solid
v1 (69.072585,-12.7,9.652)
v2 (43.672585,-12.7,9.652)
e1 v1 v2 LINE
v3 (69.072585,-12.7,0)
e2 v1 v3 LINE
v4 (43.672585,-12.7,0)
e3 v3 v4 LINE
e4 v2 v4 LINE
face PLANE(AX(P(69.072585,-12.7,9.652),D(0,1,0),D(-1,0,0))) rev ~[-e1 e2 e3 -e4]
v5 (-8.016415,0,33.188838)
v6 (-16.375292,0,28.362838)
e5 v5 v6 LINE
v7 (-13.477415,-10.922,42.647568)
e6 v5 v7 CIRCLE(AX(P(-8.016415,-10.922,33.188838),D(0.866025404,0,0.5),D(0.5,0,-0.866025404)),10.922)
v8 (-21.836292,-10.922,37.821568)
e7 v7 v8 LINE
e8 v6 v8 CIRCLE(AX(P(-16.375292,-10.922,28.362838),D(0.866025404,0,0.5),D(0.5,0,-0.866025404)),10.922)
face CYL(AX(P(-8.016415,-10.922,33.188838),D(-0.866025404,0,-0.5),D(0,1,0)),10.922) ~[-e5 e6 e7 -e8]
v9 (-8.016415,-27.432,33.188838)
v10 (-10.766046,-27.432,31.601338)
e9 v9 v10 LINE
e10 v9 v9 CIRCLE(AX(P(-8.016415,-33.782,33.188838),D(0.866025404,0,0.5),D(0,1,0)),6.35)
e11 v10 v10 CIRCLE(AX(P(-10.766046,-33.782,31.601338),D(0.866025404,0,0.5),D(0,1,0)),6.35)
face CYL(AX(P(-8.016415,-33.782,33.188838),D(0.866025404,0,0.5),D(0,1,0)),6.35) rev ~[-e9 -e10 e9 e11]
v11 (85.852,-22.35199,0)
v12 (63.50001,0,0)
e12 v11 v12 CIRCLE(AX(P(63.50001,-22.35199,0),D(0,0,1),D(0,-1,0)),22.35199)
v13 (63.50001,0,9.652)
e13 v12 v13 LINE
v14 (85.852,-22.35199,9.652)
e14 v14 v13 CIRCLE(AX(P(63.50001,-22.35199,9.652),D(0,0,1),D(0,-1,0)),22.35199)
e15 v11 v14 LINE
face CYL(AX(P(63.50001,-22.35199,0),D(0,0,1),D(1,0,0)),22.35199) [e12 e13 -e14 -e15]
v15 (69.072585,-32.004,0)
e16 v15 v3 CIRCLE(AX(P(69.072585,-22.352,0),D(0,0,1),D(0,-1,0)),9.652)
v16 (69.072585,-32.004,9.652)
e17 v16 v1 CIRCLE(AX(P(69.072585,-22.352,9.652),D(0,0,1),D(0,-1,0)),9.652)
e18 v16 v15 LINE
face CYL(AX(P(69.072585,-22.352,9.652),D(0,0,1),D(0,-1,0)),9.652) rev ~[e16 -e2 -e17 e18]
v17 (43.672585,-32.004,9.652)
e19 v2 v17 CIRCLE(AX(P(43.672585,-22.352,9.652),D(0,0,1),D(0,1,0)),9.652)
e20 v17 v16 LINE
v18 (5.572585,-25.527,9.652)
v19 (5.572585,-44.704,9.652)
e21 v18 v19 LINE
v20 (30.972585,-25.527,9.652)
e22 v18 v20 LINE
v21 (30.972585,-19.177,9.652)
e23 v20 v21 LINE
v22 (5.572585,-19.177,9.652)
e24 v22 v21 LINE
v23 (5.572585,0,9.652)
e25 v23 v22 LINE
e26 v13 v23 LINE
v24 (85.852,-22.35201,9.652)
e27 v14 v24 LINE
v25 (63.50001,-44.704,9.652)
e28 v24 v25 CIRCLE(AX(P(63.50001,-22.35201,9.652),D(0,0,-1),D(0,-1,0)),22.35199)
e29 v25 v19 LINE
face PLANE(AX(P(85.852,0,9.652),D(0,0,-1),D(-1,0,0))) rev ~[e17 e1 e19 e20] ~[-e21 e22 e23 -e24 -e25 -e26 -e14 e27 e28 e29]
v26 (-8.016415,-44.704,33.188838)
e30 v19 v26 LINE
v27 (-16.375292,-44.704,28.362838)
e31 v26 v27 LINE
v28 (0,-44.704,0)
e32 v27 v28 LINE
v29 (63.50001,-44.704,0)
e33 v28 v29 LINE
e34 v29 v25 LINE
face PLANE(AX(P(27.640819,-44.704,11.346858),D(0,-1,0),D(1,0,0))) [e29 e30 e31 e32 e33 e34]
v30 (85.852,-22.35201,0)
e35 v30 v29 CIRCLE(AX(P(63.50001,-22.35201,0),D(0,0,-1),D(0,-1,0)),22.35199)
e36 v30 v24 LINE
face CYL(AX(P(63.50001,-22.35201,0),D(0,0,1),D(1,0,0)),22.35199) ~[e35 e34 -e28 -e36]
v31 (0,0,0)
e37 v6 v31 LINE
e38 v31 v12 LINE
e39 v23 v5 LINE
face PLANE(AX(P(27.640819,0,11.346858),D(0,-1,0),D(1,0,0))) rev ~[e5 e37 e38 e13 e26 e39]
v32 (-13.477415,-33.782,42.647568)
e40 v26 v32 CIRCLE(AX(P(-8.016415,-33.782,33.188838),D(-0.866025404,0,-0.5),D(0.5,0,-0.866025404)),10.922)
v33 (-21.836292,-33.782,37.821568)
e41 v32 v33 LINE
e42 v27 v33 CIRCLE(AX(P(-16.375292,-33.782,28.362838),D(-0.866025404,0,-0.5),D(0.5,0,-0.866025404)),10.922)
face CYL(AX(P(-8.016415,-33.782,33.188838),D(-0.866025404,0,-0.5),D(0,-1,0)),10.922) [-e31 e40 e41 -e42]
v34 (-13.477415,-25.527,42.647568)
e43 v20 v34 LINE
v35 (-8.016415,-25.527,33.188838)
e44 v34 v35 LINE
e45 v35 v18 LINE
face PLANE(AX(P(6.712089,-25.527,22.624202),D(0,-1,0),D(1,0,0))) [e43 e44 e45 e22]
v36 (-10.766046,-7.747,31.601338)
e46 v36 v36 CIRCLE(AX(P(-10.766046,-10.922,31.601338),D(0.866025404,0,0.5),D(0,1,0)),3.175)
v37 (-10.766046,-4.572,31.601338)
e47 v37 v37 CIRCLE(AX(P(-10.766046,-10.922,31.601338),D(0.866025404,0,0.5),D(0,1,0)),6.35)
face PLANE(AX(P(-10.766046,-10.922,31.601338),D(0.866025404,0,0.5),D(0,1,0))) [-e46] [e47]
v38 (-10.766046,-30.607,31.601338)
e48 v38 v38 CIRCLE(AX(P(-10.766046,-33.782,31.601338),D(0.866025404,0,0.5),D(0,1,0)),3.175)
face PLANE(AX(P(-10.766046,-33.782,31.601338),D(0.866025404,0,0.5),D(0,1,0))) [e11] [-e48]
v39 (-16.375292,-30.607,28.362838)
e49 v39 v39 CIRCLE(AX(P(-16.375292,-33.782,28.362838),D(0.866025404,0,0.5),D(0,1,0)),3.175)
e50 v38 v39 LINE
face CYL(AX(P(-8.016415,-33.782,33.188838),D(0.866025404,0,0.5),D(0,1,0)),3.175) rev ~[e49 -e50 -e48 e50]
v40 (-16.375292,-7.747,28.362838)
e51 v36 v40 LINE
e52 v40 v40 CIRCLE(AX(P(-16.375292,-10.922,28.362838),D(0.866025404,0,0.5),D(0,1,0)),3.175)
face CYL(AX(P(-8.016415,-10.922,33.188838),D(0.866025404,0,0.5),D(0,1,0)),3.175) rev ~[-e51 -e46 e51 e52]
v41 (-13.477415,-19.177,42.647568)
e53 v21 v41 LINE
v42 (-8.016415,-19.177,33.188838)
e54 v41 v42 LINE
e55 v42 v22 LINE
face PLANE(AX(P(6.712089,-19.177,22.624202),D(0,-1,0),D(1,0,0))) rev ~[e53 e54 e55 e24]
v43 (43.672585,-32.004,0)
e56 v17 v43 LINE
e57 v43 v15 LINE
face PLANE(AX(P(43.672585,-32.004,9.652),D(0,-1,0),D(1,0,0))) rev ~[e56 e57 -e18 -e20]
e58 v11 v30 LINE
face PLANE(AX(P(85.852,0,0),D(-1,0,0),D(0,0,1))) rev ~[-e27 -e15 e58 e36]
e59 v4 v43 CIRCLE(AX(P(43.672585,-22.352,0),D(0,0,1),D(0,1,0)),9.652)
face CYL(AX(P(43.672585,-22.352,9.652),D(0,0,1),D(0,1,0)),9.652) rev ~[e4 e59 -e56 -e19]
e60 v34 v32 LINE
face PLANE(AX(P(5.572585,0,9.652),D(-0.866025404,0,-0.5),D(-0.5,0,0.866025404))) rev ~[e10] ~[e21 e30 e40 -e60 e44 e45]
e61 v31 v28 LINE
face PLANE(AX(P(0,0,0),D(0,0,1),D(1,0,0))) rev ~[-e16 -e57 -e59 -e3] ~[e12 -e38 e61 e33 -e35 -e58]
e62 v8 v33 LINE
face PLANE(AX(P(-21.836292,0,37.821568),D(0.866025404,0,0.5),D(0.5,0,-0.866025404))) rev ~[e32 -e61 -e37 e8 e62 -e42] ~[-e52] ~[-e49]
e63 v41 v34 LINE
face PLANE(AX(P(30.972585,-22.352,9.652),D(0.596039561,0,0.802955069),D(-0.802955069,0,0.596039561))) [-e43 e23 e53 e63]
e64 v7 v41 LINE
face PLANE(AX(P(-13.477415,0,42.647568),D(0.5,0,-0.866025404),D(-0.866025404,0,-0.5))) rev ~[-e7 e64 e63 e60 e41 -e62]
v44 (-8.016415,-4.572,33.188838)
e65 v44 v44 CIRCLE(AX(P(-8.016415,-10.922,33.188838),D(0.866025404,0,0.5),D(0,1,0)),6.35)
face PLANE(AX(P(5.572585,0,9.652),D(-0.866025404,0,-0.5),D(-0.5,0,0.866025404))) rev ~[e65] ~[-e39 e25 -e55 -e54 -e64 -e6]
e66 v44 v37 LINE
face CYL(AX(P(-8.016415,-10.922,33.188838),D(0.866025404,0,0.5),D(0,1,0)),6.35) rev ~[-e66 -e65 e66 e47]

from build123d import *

# Parameters (mm, degrees)
F1_DEPTH  = 44.704
F3_R      = 22.35199
F5_R      = 10.922
F4_R      = 3.175
F6_DEPTH  = 28.5637839421
F4_R_2    = 6.35
F7_DEPTH  = 3.175
F8_DEPTH  = 9.653
F11_DEPTH = 3.175


# Not quite as in the source:
# - a fillet or chamfer is up to 0.001 mm smaller than in the source, because OpenCascade refuses the exact size


with BuildPart() as f1:
    # F0 (on Front) → F1 (new body)
    with BuildSketch(Plane.XZ):
        Polygon((-21.8362923991, 37.8215678842), (0, 0), (85.852, 0), (85.852, 9.652), (30.9725847982, 9.652), (5.5725847982, 9.652), (-13.4774152018, 42.6475678842), align=None)
    extrude(amount=F1_DEPTH)

    # F3 (radius 22.352 in the source; OpenCascade refuses exactly that, so slightly less here)
    f3_edges = [f1.edges().sort_by_distance(p)[0] for p in [
        (85.852, -44.704, 4.826),
        (85.852, 0, 4.826),
    ]]
    fillet(f3_edges, radius=F3_R)

    # F5
    f5_edges = [f1.edges().sort_by_distance(p)[0] for p in [
        (-17.656854, -44.704, 40.234568),
        (-17.656854, 0, 40.234568),
    ]]
    fillet(f5_edges, radius=F5_R)

    # F4 (on face) → F6 (cut, through all)
    with BuildSketch(Plane(origin=(8.3588771973, 0, 4.826), x_dir=(0, 1, 0), z_dir=(0.8660254038, 0, 0.5))):
        with Locations((-33.782, 32.7505847982)):
            Circle(F4_R)
        with Locations((-10.922, 32.7505847982)):
            Circle(F4_R)
    extrude(amount=-F6_DEPTH, mode=Mode.SUBTRACT)

    # F4 (on face) → F7 (cut)
    with BuildSketch(Plane(origin=(8.3588771973, 0, 4.826), x_dir=(0, 1, 0), z_dir=(0.8660254038, 0, 0.5))):
        with Locations((-33.782, 32.7505847982)):
            Circle(F4_R_2)
        with Locations((-33.782, 32.7505847982)):
            Circle(F4_R, mode=Mode.SUBTRACT)
        with Locations((-10.922, 32.7505847982)):
            Circle(F4_R_2)
        with Locations((-10.922, 32.7505847982)):
            Circle(F4_R, mode=Mode.SUBTRACT)
    extrude(amount=-F7_DEPTH, mode=Mode.SUBTRACT)

    # F2 (on face) → F8 (cut, through all)
    with BuildSketch(Plane.XY.offset(9.652)):
        with BuildLine():
            Line((43.6725847982, -32.004), (69.0725847982, -32.004))
            ThreePointArc((69.0725847982, -32.004), (78.7245847982, -22.352), (69.0725847982, -12.7))
            Line((69.0725847982, -12.7), (43.6725847982, -12.7))
            ThreePointArc((43.6725847982, -12.7), (34.0205847982, -22.352), (43.6725847982, -32.004))
        make_face()
    extrude(amount=-F8_DEPTH, mode=Mode.SUBTRACT)

    # F10 (on offset) → F11 (join, symmetric)
    with BuildSketch(Plane.XZ.offset(22.352)):
        Polygon((30.9725847982, 9.652), (-13.4774152018, 42.6475678842), (-8.0164152018, 33.1888384241), (5.5725847982, 9.652), align=None)
    extrude(amount=F11_DEPTH, both=True)


solid = f1.part
